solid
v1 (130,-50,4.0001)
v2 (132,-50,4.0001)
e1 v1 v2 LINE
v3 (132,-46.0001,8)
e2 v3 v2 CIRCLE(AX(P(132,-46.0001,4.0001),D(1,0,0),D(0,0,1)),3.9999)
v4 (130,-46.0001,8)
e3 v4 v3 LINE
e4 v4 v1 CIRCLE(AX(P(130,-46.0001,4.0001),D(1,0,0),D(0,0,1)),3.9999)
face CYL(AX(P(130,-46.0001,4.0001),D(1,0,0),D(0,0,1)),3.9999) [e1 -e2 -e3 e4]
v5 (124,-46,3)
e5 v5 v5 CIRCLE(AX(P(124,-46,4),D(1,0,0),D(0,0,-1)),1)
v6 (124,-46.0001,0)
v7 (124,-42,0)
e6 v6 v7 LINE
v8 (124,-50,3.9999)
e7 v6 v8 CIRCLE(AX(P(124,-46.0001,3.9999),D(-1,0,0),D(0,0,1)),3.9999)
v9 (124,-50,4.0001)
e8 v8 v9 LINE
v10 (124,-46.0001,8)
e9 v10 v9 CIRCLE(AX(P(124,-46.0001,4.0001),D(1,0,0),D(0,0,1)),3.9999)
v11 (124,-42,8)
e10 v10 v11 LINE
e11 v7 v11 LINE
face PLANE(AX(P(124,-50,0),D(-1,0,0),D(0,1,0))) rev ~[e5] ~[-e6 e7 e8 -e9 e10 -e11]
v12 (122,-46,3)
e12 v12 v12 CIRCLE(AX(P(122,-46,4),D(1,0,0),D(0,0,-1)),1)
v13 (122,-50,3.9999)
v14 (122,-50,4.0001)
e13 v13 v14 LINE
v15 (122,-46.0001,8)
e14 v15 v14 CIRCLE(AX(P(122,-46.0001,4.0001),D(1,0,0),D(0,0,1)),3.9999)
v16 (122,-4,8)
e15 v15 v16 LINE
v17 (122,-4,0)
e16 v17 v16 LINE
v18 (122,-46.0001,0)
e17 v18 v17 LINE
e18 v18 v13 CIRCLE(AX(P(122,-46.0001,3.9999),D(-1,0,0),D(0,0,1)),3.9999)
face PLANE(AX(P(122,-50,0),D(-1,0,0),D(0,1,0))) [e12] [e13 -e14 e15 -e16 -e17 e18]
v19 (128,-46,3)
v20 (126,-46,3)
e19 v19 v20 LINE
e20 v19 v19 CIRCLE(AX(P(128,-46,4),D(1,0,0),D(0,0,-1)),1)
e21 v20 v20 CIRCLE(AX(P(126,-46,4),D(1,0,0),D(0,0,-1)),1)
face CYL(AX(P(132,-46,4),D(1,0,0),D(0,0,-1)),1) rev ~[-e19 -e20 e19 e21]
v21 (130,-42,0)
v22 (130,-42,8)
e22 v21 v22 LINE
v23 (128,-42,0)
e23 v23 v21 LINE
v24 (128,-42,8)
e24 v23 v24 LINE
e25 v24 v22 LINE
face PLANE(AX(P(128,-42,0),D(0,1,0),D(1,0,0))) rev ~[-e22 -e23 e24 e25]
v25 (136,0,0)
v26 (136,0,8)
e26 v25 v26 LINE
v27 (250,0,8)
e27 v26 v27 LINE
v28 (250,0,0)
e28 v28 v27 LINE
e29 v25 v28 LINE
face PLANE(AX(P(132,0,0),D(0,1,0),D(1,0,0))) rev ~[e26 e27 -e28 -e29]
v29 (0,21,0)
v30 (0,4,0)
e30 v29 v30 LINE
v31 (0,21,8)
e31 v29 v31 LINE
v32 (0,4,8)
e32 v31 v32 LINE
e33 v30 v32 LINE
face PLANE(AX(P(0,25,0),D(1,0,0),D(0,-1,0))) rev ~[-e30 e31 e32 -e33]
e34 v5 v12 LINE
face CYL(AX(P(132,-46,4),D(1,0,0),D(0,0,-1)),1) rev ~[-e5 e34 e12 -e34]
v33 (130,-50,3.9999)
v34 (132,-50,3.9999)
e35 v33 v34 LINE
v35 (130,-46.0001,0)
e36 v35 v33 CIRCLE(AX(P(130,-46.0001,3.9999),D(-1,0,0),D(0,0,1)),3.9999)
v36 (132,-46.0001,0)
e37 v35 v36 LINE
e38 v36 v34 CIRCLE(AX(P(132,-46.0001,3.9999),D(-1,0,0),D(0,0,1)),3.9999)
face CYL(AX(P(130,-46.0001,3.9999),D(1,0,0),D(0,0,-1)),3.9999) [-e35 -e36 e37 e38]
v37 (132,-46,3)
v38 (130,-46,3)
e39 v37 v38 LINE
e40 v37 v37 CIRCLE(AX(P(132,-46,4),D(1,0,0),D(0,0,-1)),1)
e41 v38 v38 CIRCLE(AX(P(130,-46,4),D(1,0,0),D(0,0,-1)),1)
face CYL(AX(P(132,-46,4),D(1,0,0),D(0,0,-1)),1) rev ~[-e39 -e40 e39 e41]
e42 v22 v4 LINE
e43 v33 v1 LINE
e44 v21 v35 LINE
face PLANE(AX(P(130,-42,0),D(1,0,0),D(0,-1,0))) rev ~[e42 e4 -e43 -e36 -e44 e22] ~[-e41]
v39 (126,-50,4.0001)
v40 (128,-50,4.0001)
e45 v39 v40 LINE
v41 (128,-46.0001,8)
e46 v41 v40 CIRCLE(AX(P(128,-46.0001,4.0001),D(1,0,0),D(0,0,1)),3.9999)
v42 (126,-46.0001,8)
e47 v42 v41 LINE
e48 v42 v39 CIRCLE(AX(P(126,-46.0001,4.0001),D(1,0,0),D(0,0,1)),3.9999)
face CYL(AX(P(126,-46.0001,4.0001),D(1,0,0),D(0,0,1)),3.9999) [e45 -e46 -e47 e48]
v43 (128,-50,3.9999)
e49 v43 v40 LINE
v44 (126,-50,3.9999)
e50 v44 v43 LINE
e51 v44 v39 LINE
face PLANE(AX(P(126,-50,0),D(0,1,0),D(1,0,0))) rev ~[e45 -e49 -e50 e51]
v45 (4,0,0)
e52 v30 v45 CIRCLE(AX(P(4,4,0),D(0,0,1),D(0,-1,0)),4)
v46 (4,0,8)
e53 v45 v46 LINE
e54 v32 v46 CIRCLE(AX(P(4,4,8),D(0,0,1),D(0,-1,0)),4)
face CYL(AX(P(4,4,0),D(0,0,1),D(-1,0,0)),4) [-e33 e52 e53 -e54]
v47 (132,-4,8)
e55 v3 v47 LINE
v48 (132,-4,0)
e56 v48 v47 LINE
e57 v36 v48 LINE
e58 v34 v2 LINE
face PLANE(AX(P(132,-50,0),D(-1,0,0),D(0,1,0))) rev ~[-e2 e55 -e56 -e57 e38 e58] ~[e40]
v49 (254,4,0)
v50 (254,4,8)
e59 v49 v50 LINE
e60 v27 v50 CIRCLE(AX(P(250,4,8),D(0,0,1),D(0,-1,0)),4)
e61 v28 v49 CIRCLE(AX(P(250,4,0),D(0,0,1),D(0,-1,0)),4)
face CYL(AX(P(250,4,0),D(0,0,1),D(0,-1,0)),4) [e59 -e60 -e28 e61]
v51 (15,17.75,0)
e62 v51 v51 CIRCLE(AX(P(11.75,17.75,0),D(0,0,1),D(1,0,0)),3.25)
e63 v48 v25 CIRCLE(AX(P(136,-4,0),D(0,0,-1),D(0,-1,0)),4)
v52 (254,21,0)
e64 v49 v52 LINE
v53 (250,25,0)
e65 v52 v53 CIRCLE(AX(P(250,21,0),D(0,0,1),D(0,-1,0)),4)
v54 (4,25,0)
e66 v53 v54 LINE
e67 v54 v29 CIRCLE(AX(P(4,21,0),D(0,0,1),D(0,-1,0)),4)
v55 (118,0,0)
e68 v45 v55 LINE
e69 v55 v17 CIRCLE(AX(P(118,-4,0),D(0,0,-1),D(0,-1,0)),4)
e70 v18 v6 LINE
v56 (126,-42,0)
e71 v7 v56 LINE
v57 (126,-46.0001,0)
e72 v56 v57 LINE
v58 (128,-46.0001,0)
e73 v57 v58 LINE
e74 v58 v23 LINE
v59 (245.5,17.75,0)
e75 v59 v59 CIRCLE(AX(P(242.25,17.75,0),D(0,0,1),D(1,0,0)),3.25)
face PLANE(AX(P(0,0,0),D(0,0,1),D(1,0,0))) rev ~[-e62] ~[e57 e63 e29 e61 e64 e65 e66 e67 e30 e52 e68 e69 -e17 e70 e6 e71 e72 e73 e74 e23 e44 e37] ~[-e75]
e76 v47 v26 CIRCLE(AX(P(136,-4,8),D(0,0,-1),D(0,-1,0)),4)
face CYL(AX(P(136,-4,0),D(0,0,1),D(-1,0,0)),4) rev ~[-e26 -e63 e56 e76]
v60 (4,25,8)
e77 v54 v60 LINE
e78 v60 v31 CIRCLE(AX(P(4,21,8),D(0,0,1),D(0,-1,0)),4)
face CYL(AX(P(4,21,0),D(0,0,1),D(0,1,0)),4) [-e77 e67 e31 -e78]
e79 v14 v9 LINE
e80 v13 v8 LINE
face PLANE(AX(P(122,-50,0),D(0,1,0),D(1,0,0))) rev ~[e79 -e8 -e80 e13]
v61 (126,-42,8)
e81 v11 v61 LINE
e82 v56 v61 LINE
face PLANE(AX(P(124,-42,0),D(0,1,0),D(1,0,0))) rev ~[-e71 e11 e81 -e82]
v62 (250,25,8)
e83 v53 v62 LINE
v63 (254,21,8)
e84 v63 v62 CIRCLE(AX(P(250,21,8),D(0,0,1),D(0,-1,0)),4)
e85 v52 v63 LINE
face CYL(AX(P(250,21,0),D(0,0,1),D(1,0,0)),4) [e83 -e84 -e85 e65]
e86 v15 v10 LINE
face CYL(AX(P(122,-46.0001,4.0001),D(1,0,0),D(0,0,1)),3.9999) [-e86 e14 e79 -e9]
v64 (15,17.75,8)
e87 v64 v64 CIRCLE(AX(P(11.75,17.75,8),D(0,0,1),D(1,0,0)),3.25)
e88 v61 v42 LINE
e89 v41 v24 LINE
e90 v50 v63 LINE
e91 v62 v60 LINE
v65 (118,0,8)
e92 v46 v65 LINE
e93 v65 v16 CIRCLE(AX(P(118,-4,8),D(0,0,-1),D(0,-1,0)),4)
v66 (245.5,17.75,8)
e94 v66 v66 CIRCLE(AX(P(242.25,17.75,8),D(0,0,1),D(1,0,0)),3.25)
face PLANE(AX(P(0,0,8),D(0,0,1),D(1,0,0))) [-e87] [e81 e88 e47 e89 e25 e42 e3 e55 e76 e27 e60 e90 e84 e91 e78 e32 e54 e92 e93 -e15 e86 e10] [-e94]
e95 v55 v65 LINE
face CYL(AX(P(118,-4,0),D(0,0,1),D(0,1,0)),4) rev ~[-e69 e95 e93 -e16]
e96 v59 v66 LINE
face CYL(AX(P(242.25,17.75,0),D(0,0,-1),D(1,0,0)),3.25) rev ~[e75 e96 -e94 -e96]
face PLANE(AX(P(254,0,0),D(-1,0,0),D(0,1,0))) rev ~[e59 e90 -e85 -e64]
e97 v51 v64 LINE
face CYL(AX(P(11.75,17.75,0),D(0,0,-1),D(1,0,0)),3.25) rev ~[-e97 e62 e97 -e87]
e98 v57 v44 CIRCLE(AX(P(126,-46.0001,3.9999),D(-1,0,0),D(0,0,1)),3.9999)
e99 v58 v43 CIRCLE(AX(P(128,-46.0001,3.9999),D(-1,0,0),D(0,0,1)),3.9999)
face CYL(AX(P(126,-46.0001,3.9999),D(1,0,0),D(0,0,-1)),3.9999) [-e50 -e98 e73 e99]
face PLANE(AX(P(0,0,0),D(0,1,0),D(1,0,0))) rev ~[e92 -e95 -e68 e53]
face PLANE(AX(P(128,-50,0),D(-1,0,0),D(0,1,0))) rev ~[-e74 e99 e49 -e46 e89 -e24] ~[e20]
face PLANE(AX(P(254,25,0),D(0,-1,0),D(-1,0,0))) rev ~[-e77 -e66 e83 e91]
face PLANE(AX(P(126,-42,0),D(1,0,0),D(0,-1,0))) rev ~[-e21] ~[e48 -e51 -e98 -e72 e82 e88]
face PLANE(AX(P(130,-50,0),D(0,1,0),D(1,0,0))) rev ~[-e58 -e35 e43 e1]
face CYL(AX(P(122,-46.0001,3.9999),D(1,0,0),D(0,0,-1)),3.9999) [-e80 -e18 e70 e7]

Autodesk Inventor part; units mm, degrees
ref_plane "YZ Plane" through (0, 0, 0) normal (1, 0, 0) x (0, 1, 0)
ref_plane "XZ Plane" through (0, 0, 0) normal (0, 1, 0) x (-1, 0, 0)
ref_plane "XY Plane" through (0, 0, 0) normal (0, 0, 1) x (1, 0, 0)
sketch "Sketch1" plane through (0, 0, 0) normal (0, 0, 1) x (1, 0, 0)
  line L0 (254, 0) -> (254, 25)
  line L1 (254, 25) -> (0, 25)
  line L2 (0, 25) -> (0, 0)
  line L3 (0, 25) -> (0, 21) construction
  line L4 (0, 21) -> (8.5, 21) construction
  line L5 (8.5, 21) -> (11.75, 21) construction
  line L6 (11.75, 21) -> (11.75, 17.75) construction
  circle A0 centre (11.75, 17.75) radius 3.25
  line L7 (254, 25) -> (254, 21) construction
  line L8 (254, 21) -> (245.5, 21) construction
  line L9 (245.5, 21) -> (245.5, 17.75) construction
  line L10 (245.5, 17.75) -> (242.25, 17.75) construction
  circle A1 centre (242.25, 17.75) radius 3.25
  line L11 (132, -50) -> (132, 0)
  line L12 (122, -50) -> (122, 0)
  line L13 (0, 0) -> (122, 0)
  line L14 (132, 0) -> (254, 0)
  line L15 (122, -50) -> (124, -50)
  line L16 (124, -50) -> (124, -42)
  line L17 (124, -42) -> (126, -42)
  line L18 (126, -42) -> (126, -50)
  line L19 (126, -50) -> (128, -50)
  line L20 (128, -50) -> (128, -42)
  line L21 (128, -42) -> (130, -42)
  line L22 (130, -42) -> (130, -50)
  line L23 (130, -50) -> (132, -50)
  dimension "d0" = 254
  dimension "d1" = 25
  dimension "d2" = 4
  dimension "d3" = 8.5
  dimension "d4" = 3.25
  dimension "d5" = 3.25
  dimension "d6" = 4
  dimension "d7" = 8.5
  dimension "d8" = 3.25
  dimension "d9" = 3.25
  dimension "d13" = 122
  dimension "d14" = 242.25
  dimension "d16" = 2
  dimension "d17" = 8
  dimension "d18" = 2
  dimension "d19" = 8
  dimension "d20" = 2
  dimension "d21" = 8
  dimension "d22" = 2
  dimension "d23" = 124
  dimension "d24" = 63
extrude "Extrusion1" add sketch "Sketch1" along normal blind 8
sketch "Sketch3" plane through (132, -50, 0) normal (1, 0, 0) x (0, 0, -1)
  line L0 (0, 0) -> (-8, 0) projected
  line L1 (0, 8) -> (-8, 8) projected
  line L2 (0, 0) -> (-8, 0) construction
  line L3 (-4, 0) -> (-4, 8) construction
  circle A0 centre (-4, 4) radius 1
  point P0 (0, 50)
  point P1 (-12, 0)
  point P2 (-12, 8)
  dimension "d39" = 2
extrude "Extrusion3" cut sketch "Sketch3" against normal blind 46.75
fillet "Fillet2" radius 4 6 edges at (127, -50, 8) (127, -50, 0) (123, -50, 0) (123, -50, 8) (131, -50, 0) (131, -50, 8)
fillet "Fillet4" radius 4 6 edges at (0, 25, 4) (0, 0, 4) (122, 0, 4) (132, 0, 4) (254, 0, 4) (254, 25, 4)
properties part number "WebcamBase"
